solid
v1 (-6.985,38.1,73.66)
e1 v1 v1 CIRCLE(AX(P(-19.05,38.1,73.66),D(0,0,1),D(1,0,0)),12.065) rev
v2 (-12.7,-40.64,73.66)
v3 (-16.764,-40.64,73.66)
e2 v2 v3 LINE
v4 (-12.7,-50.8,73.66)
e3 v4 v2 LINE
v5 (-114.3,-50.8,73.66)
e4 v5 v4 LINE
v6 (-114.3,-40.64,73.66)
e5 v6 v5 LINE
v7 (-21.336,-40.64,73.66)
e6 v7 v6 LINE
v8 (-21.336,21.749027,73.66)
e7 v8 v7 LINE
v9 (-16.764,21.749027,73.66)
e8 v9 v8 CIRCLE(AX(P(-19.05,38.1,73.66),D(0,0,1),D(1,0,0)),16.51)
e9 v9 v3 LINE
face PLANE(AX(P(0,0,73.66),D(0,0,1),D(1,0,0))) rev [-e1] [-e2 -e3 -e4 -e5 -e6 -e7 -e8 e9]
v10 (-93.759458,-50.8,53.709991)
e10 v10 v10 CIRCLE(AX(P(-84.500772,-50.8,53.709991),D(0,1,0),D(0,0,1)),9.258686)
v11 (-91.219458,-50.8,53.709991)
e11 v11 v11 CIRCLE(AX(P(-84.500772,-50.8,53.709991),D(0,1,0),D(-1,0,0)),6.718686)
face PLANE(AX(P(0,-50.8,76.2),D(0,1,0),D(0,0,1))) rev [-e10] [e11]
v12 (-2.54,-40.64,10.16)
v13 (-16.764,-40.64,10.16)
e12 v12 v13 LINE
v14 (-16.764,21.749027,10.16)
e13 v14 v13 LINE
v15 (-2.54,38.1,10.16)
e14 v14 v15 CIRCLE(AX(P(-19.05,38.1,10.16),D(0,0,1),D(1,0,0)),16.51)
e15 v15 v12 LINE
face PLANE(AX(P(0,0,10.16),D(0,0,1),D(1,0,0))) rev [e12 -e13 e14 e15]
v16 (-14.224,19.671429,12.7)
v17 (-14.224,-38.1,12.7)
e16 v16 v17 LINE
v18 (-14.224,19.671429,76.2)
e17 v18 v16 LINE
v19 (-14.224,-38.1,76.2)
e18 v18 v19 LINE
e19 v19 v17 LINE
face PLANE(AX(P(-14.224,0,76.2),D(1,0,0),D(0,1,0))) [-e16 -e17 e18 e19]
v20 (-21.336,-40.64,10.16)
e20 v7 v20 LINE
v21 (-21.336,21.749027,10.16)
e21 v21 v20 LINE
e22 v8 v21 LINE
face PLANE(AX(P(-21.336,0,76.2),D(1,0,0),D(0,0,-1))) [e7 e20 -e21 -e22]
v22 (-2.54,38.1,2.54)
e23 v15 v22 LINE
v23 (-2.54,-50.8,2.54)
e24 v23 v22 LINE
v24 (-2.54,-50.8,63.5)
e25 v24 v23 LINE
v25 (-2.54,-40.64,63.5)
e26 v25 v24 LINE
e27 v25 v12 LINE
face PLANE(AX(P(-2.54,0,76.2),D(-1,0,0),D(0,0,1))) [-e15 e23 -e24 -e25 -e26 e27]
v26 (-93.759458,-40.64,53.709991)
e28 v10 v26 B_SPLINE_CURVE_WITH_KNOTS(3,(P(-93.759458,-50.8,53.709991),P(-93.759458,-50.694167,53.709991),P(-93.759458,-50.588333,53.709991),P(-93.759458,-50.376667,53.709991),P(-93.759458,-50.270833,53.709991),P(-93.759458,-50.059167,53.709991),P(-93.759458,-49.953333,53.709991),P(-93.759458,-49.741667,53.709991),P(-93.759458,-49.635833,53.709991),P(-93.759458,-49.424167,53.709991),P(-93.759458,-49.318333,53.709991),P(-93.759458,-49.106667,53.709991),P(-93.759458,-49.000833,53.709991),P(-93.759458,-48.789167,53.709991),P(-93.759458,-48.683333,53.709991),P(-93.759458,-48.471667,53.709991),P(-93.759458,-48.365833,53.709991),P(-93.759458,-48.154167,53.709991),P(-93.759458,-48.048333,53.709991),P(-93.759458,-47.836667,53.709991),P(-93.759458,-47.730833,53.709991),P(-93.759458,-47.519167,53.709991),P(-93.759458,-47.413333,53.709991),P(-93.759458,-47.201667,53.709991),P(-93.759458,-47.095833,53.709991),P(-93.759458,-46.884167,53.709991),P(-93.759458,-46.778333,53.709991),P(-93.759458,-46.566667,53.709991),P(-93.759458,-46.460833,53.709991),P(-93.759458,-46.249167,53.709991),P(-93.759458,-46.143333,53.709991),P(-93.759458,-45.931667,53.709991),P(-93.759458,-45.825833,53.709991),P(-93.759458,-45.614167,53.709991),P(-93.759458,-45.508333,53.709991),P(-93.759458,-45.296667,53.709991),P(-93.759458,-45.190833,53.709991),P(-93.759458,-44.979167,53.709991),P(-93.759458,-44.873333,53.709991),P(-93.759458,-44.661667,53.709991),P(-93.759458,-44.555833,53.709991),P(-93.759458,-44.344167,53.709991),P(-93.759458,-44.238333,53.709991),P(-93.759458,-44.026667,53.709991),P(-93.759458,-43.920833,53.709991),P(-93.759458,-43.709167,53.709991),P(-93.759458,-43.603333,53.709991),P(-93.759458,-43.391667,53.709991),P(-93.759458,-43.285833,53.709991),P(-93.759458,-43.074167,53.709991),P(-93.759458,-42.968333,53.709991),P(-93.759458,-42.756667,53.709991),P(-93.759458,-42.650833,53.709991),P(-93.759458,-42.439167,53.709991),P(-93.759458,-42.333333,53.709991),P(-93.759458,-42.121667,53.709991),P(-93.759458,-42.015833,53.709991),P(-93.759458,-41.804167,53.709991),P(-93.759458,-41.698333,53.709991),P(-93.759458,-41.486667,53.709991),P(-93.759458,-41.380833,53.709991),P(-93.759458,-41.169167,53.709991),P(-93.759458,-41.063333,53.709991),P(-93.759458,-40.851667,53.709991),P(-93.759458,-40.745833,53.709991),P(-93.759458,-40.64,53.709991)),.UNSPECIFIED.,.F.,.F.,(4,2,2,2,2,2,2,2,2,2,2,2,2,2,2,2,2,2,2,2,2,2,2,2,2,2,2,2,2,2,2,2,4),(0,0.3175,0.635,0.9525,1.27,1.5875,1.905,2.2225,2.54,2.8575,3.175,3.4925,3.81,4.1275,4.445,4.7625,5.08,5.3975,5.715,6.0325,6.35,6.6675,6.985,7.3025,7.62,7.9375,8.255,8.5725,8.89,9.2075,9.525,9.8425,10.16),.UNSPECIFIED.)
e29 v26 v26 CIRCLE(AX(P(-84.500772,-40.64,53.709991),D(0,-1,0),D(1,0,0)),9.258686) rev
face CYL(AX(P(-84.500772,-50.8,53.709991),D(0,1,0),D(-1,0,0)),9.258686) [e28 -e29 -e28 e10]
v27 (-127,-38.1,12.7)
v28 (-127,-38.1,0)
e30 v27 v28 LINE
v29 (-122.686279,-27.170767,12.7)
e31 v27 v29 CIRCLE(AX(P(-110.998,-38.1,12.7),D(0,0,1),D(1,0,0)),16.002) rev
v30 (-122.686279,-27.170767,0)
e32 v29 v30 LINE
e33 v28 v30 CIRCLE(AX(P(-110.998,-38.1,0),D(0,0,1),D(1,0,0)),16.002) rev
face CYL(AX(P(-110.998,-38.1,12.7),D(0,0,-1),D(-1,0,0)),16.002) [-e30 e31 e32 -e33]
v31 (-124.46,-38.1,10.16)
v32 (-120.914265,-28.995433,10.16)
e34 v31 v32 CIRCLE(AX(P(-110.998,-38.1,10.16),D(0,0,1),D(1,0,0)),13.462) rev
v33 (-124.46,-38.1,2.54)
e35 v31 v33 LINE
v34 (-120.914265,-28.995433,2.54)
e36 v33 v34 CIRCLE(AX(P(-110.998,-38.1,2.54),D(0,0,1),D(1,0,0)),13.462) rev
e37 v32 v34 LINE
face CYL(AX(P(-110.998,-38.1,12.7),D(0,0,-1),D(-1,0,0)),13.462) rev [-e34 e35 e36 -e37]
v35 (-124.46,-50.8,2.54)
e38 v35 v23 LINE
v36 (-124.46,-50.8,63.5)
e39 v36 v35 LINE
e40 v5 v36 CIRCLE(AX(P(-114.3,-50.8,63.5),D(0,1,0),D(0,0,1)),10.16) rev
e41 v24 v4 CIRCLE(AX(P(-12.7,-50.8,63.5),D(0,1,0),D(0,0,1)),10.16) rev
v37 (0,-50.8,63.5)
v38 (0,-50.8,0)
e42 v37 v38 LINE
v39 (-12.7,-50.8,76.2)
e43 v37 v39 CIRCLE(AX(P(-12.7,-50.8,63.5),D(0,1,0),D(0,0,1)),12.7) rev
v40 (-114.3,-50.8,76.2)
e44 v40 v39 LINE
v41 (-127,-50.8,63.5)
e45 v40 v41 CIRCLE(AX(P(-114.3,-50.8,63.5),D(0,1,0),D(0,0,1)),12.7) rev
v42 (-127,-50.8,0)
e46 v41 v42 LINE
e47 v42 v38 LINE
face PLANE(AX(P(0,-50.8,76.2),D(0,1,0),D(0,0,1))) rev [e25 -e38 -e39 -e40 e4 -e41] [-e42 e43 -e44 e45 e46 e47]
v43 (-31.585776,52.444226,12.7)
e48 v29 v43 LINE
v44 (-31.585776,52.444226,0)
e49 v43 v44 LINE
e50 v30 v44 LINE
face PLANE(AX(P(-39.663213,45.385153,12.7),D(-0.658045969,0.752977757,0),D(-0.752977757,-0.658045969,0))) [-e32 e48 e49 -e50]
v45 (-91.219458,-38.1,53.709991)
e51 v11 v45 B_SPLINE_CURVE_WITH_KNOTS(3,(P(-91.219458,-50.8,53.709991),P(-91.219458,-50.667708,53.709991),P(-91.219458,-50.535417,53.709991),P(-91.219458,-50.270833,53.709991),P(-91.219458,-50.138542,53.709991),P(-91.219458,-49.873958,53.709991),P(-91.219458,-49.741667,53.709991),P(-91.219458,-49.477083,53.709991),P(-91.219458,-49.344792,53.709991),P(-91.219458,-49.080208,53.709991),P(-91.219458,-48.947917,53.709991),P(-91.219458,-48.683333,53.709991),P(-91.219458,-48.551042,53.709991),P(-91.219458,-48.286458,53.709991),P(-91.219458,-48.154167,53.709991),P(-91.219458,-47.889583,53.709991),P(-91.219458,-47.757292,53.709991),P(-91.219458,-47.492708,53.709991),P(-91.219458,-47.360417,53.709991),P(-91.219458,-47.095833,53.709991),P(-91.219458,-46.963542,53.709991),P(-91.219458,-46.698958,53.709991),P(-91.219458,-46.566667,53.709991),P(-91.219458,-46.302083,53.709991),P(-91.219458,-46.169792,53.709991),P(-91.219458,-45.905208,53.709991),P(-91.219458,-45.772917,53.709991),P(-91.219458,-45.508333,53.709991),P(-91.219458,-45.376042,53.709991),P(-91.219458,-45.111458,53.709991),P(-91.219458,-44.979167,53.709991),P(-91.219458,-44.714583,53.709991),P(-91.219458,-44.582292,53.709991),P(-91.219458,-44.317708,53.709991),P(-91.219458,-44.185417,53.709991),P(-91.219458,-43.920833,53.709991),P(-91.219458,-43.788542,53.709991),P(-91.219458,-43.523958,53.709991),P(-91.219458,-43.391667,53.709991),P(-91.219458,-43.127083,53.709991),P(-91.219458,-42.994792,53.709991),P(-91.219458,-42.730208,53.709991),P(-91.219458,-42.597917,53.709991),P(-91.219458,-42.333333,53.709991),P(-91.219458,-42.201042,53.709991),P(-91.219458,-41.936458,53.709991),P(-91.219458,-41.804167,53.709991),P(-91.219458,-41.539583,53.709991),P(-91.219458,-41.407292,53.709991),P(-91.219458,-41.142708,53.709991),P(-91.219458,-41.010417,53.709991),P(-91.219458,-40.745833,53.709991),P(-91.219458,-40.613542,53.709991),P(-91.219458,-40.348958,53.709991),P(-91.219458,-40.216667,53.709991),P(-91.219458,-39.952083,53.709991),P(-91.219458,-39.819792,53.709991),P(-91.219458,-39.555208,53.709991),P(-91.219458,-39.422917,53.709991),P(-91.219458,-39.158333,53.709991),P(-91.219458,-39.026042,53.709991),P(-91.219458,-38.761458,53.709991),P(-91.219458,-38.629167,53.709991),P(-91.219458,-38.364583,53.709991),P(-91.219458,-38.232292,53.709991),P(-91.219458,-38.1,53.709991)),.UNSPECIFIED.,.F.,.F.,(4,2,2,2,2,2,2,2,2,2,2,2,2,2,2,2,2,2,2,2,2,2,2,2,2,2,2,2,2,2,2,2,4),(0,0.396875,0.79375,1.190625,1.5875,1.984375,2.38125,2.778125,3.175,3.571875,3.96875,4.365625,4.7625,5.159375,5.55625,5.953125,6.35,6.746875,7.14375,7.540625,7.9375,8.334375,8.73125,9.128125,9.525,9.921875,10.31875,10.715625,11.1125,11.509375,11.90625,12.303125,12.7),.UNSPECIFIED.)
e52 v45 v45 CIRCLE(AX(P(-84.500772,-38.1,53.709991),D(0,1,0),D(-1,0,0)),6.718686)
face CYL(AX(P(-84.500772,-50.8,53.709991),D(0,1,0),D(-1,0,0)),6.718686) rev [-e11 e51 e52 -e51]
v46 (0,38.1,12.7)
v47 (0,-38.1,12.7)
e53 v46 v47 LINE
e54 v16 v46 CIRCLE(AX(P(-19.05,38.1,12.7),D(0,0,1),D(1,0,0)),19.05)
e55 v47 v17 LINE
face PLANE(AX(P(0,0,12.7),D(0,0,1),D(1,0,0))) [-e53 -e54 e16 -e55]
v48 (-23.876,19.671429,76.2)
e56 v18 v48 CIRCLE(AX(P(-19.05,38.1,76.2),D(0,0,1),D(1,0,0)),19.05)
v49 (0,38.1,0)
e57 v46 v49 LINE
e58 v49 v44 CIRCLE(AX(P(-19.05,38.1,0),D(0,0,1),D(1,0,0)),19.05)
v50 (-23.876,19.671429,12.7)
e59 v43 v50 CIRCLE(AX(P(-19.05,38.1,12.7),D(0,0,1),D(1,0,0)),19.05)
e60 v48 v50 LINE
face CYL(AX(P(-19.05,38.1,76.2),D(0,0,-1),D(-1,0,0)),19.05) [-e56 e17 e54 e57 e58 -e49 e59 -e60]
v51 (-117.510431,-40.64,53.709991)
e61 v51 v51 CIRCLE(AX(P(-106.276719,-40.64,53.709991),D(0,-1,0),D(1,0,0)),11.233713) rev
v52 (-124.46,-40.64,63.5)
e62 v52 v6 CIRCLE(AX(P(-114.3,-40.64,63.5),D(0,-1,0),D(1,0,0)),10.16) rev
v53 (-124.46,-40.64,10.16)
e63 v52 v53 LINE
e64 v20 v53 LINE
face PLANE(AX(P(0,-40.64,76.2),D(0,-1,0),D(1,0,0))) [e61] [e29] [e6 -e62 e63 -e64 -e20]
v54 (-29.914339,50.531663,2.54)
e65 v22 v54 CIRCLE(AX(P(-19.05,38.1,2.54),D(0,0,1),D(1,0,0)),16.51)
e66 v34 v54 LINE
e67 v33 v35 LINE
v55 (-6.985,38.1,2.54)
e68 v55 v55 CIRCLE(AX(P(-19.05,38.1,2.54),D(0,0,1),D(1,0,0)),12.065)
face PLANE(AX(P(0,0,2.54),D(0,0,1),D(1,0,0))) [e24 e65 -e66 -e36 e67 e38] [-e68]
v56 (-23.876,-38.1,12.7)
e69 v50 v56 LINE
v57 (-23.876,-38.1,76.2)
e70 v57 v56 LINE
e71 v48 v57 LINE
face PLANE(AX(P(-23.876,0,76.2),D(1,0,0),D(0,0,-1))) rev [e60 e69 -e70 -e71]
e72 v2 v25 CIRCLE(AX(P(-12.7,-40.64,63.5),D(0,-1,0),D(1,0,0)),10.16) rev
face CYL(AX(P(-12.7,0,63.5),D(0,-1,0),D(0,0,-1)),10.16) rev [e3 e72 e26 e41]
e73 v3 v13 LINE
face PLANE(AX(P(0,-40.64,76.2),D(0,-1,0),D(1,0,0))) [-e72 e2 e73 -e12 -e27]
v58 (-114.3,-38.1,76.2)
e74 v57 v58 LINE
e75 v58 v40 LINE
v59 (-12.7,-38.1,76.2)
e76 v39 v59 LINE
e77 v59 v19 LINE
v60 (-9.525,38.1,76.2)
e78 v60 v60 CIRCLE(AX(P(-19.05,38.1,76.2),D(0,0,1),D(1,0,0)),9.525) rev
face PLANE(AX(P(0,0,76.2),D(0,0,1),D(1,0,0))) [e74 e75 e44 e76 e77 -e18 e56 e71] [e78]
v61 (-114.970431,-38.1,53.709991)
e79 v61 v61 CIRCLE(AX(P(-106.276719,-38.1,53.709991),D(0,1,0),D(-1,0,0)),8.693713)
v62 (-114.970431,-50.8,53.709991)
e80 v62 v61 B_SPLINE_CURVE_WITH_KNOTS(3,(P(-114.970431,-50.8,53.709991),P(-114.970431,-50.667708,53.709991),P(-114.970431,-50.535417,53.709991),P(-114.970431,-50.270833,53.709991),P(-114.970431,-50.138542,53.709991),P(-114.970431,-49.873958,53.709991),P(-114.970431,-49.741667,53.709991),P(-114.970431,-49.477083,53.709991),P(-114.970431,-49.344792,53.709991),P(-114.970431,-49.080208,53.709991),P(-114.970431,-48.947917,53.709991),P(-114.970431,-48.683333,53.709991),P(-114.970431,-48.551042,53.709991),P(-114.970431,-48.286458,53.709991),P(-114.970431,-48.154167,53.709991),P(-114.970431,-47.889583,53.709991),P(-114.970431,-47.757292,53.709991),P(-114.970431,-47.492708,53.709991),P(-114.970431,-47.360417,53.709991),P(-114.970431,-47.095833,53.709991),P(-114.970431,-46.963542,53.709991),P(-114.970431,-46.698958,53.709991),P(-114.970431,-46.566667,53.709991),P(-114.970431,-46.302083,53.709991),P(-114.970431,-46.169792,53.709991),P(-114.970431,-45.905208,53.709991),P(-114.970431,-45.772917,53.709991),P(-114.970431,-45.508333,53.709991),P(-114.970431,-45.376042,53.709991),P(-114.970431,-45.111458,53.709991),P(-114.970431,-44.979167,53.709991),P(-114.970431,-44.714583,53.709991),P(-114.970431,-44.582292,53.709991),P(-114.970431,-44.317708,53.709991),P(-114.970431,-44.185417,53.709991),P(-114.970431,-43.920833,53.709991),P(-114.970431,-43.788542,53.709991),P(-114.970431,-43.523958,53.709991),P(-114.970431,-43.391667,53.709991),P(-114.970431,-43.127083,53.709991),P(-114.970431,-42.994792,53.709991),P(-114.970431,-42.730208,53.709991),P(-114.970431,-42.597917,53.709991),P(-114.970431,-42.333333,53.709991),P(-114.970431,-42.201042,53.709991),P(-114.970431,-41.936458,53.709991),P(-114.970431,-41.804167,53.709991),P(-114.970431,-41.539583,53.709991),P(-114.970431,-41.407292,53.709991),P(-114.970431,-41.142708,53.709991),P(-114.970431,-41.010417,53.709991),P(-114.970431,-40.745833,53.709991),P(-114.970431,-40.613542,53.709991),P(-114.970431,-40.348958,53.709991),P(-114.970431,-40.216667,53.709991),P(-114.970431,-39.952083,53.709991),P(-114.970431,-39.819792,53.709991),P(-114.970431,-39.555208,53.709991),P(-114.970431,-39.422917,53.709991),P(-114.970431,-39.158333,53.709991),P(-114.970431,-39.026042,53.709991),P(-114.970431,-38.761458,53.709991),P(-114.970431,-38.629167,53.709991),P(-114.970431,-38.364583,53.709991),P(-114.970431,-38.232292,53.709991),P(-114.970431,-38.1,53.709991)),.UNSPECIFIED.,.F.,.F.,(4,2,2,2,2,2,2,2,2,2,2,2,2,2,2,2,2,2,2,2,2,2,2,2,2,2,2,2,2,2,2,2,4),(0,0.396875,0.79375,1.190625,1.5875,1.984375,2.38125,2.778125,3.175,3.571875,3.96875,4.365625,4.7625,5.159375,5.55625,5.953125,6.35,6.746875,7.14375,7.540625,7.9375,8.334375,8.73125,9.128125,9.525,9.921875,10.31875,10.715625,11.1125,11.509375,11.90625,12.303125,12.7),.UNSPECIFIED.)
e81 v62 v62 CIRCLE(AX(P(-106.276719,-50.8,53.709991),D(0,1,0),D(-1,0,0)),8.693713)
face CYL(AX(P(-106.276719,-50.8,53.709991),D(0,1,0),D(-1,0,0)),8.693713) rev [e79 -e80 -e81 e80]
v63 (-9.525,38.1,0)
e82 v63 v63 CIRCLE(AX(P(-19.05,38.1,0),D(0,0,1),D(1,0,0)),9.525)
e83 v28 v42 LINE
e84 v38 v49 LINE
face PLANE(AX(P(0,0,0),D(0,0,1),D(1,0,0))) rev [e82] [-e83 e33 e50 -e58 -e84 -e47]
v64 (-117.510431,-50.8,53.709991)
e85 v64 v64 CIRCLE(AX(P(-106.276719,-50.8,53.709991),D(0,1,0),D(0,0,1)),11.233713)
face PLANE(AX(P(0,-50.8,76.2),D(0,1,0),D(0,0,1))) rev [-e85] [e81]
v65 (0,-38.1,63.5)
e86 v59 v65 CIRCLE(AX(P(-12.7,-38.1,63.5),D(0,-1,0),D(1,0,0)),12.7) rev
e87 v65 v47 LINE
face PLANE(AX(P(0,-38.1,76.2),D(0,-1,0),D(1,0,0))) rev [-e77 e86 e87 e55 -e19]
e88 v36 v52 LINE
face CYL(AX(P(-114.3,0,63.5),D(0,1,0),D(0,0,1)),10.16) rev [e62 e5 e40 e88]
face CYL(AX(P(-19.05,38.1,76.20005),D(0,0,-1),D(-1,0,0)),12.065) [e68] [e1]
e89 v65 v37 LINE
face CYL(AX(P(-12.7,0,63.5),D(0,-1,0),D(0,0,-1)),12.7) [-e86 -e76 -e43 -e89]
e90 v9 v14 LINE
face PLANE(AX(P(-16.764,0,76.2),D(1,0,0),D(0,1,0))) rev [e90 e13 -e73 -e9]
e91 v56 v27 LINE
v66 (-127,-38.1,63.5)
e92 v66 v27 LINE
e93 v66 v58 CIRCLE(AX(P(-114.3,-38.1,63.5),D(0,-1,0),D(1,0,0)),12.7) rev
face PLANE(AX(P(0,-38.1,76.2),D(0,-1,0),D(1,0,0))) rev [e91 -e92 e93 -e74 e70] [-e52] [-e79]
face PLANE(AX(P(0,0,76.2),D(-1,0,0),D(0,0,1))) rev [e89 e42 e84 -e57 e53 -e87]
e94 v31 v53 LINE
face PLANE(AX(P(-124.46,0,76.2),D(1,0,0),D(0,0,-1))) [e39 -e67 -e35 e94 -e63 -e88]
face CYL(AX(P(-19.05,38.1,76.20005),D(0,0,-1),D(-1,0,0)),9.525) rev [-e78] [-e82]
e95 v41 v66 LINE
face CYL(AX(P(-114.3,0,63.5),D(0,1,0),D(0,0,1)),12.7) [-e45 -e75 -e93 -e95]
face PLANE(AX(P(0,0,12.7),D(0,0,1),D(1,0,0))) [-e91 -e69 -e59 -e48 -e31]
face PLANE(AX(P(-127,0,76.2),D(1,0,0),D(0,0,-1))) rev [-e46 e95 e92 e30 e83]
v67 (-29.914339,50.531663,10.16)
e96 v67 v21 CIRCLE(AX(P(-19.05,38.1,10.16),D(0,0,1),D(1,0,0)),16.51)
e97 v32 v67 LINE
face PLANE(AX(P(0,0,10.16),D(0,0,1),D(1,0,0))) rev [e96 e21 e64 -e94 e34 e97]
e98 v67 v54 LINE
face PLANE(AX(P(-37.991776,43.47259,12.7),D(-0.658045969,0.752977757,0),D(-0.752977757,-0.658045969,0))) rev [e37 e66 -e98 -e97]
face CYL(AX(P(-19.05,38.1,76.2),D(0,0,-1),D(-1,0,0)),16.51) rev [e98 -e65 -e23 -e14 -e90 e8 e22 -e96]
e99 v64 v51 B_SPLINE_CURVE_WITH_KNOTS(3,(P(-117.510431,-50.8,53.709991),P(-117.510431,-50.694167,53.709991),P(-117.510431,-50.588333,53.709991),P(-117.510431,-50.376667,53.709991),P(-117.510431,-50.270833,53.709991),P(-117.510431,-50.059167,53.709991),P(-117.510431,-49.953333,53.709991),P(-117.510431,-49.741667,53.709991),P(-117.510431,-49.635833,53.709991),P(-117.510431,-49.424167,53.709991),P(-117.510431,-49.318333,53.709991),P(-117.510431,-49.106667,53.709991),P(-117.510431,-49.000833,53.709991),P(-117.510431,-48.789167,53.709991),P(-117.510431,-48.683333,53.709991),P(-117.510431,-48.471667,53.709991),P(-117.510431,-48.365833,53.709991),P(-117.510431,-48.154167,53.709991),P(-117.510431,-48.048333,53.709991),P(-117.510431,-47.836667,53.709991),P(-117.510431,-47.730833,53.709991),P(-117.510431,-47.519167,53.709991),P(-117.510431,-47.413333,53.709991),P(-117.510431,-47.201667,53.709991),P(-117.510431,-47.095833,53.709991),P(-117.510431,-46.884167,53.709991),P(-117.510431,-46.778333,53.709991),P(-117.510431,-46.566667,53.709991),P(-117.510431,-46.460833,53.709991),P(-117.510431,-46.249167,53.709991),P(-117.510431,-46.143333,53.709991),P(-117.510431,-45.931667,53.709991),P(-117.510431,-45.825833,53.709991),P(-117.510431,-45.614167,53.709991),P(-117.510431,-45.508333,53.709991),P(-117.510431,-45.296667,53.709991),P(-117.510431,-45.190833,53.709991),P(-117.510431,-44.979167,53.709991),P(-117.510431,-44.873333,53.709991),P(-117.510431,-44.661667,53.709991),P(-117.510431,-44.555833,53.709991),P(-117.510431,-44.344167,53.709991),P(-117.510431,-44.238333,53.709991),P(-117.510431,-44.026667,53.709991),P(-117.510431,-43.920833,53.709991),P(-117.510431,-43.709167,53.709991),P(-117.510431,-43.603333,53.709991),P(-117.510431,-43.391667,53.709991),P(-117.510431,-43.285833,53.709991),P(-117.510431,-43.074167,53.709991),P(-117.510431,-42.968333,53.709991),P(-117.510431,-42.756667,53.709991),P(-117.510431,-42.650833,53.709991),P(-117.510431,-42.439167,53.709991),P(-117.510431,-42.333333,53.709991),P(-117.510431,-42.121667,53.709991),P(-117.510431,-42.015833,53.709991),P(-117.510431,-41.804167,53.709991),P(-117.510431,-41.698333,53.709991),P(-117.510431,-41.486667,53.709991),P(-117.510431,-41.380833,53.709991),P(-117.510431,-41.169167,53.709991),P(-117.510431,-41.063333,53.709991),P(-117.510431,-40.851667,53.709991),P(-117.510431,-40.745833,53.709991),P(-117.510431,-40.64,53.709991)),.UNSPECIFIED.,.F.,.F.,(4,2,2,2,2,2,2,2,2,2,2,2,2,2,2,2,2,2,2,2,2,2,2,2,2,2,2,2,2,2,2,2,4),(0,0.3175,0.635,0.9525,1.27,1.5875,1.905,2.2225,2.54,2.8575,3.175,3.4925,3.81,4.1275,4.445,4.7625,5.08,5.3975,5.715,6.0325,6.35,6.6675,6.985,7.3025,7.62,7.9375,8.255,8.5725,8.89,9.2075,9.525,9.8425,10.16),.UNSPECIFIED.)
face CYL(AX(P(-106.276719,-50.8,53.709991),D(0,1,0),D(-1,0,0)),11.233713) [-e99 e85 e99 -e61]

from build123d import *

# Parameters (mm, degrees)
SKETCH1_W            = 127
SKETCH1_H            = 12.7
BOSS_EXTRUDE1_DEPTH  = 76.2
FILLET2_R            = 12.7
BOSS_EXTRUDE3_DEPTH  = 76.2
BOSS_EXTRUDE4_DEPTH  = 12.7
SKETCH3_R            = 8.693712638
SKETCH3_R_2          = 6.718686286
CUT_EXTRUDE2_DEPTH   = 177.090892723
SKETCH1_8_R          = 9.525
CUT_EXTRUDE3_DEPTH   = 159.75
SHELL4_START         = 2.54
SHELL4_OUTLINE_R     = 12.065
SHELL4_DEPTH         = 41.911304946
SHELL4_2_DEPTH       = 7.62
SHELL4_START_2       = 62.968677719
SHELL4_3_OUTLINE_R   = 12.065
SHELL4_3_DEPTH       = 0.531322281
SHELL4_START_3       = -50.8
SHELL4_4_DEPTH       = 10.16
SHELL4_START_4       = -40.64
SHELL4_5_OUTLINE_W   = 4.572
SHELL4_5_OUTLINE_H   = 18.517372773
SHELL4_5_OUTLINE_H_2 = 10.16
SHELL4_5_DEPTH       = 66.6749999
SHELL4_6_DEPTH       = 10.16
SHELL4_START_5       = 44.451304946
SHELL4_7_OUTLINE_R   = 12.065
SHELL4_7_DEPTH       = 29.208695054


with BuildPart() as part:
    # Sketch1 → Boss-Extrude1 (new body)
    with BuildSketch(Plane.XY):
        with Locations((-63.5, -44.45)):
            Rectangle(SKETCH1_W, SKETCH1_H)
    extrude(amount=BOSS_EXTRUDE1_DEPTH)

    # Fillet2
    fillet2_edges = [part.edges().sort_by_distance(p)[0] for p in [
        (-127, -44.45, 76.2),
        (0, -44.45, 76.2),
    ]]
    fillet(fillet2_edges, radius=FILLET2_R)

    # Sketch1<6> → Boss-Extrude3 (add)
    with BuildSketch(Plane.XY):
        with BuildLine():
            ThreePointArc((-14.224, 19.671429138), (-19.05, 57.15), (-23.876, 19.671429138))
            Line((-23.876, 19.671429138), (-23.876, -38.1))
            Line((-23.876, -38.1), (-14.224, -38.1))
            Line((-14.224, -38.1), (-14.224, 19.671429138))
        make_face()
    extrude(amount=BOSS_EXTRUDE3_DEPTH)

    # Sketch1<7> → Boss-Extrude4 (add)
    with BuildSketch(Plane.XY):
        with BuildLine():
            ThreePointArc((-23.876, 19.671429138), (-37.59378257, 33.737589198), (-31.585775702, 52.444226279))
            Line((-31.585775702, 52.444226279), (-122.686278821, -27.170766624))
            ThreePointArc((-122.686278821, -27.170766624), (-125.882553095, -32.225131223), (-127, -38.1))
            Line((-127, -38.1), (-23.876, -38.1))
            Line((-23.876, -38.1), (-23.876, 19.671429138))
        make_face()
        with BuildLine():
            Line((0, -38.1), (0, 38.1))
            ThreePointArc((0, 38.1), (-3.969585549, 26.460257735), (-14.224, 19.671429138))
            Line((-14.224, 19.671429138), (-14.224, -38.1))
            Line((-14.224, -38.1), (0, -38.1))
        make_face()
    extrude(amount=BOSS_EXTRUDE4_DEPTH)

    # Sketch3 → Cut-Extrude2 (cut, through all)
    with BuildSketch(Plane(origin=(0, -38.1, 0), x_dir=(1, 0, 0), z_dir=(0, 1, 0))):
        with Locations(Location((-106.276718745, -53.709991333, 0), (0, 0, 180))):
            Circle(SKETCH3_R)
        with Locations(Location((-84.500771906, -53.709991333, 0), (0, 0, 180))):
            Circle(SKETCH3_R_2)
    extrude(amount=-CUT_EXTRUDE2_DEPTH, mode=Mode.SUBTRACT)

    # Sketch1<8> → Cut-Extrude3 (cut, through all)
    with BuildSketch(Plane.XY):
        with Locations((-19.05, 38.1)):
            Circle(SKETCH1_8_R)
    extrude(amount=CUT_EXTRUDE3_DEPTH, mode=Mode.SUBTRACT)

    # Shell4: read off the stored shape, not the designer's step
    # Shell4 outline → Shell4 (cut)
    with BuildSketch(Plane.XY.offset(SHELL4_START)):
        with BuildLine():
            ThreePointArc((-16.764, 21.74902743), (-19.05, 54.61), (-21.336, 21.74902743))
            Line((-21.336, 21.74902743), (-21.336, -40.64))
            Line((-21.336, -40.64), (-124.46, -40.64))
            Line((-124.46, -40.64), (-124.46, -50.8))
            Line((-124.46, -50.8), (-2.54, -50.8))
            Line((-2.54, -50.8), (-2.54, -40.64))
            Line((-2.54, -40.64), (-16.764, -40.64))
            Line((-16.764, -40.64), (-16.764, 21.74902743))
        make_face()
        with Locations((-19.05, 38.1)):
            Circle(SHELL4_OUTLINE_R, mode=Mode.SUBTRACT)
    extrude(amount=SHELL4_DEPTH, mode=Mode.SUBTRACT)

    # Shell4 2 outline → Shell4 2 (cut)
    with BuildSketch(Plane.XY.offset(SHELL4_START)):
        with BuildLine():
            Line((-21.336, -40.64), (-21.336, 21.74902743))
            ThreePointArc((-21.336, 21.74902743), (-34.872227338, 33.384364087), (-29.914338942, 50.531662775))
            Line((-29.914338942, 50.531662775), (-120.914264565, -28.995432955))
            ThreePointArc((-120.914264565, -28.995432955), (-123.542285503, -33.214680644), (-124.46, -38.1))
            Line((-124.46, -38.1), (-124.46, -40.64))
            Line((-124.46, -40.64), (-21.336, -40.64))
        make_face()
        with BuildLine():
            Line((-2.54, -40.64), (-2.54, 38.1))
            ThreePointArc((-2.54, 38.1), (-6.593636968, 27.263989664), (-16.764, 21.74902743))
            Line((-16.764, 21.74902743), (-16.764, -40.64))
            Line((-16.764, -40.64), (-2.54, -40.64))
        make_face()
    extrude(amount=SHELL4_2_DEPTH, mode=Mode.SUBTRACT)

    # Shell4 3 outline → Shell4 3 (cut)
    with BuildSketch(Plane.XY.offset(SHELL4_START_2)):
        with BuildLine():
            ThreePointArc((-16.764, 21.74902743), (-19.05, 54.61), (-21.336, 21.74902743))
            Line((-21.336, 21.74902743), (-21.336, -40.64))
            Line((-21.336, -40.64), (-124.46, -40.64))
            Line((-124.46, -40.64), (-124.46, -50.8))
            Line((-124.46, -50.8), (-2.54, -50.8))
            Line((-2.54, -50.8), (-2.54, -40.64))
            Line((-2.54, -40.64), (-16.764, -40.64))
            Line((-16.764, -40.64), (-16.764, 21.74902743))
        make_face()
        with Locations((-19.05, 38.1)):
            Circle(SHELL4_3_OUTLINE_R, mode=Mode.SUBTRACT)
    extrude(amount=SHELL4_3_DEPTH, mode=Mode.SUBTRACT)

    # Shell4 4 outline → Shell4 4 (cut)
    with BuildSketch(Plane(origin=(0, 0, 0), x_dir=(1, 0, 0), z_dir=(0, 1, 0)).offset(SHELL4_START_3)):
        with BuildLine():
            Line((-2.54, -62.968677719), (-2.54, -44.451304946))
            Line((-2.54, -44.451304946), (-84.500771906, -44.451305047))
            ThreePointArc((-84.500771906, -44.451305047), (-75.24208562, -53.709991333), (-84.500771906, -62.968677619))
            Line((-84.500771906, -62.968677619), (-2.54, -62.968677719))
        make_face()
        with BuildLine():
            ThreePointArc((-12.7, -73.66), (-5.515795103, -70.684204897), (-2.54, -63.5))
            Line((-2.54, -63.5), (-100.767451105, -63.5))
            ThreePointArc((-100.767451105, -63.5), (-106.276718745, -64.943703971), (-111.785986385, -63.5))
            Line((-111.785986385, -63.5), (-124.46, -63.5))
            ThreePointArc((-124.46, -63.5), (-121.484204897, -70.684204897), (-114.3, -73.66))
            Line((-114.3, -73.66), (-12.7, -73.66))
        make_face()
        with BuildLine():
            ThreePointArc((-84.500771906, -62.968677619), (-93.759458192, -53.709991333), (-84.500771906, -44.451305047))
            Line((-84.500771906, -44.451305047), (-99.914877343, -44.451304946))
            ThreePointArc((-99.914877343, -44.451304946), (-95.043006107, -53.709991332), (-99.914877342, -62.968677719))
            Line((-99.914877342, -62.968677719), (-84.500771906, -62.968677619))
        make_face()
        with BuildLine():
            ThreePointArc((-112.638560148, -62.968677719), (-117.510431383, -53.709991332), (-112.638560147, -44.451304946))
            Line((-112.638560147, -44.451304946), (-124.46, -44.451304946))
            Line((-124.46, -44.451304946), (-124.46, -62.968677719))
            Line((-124.46, -62.968677719), (-112.638560148, -62.968677719))
        make_face()
    extrude(amount=SHELL4_4_DEPTH, mode=Mode.SUBTRACT)

    # Shell4 5 outline → Shell4 5 (cut)
    with BuildSketch(Plane(origin=(0, 0, 0), x_dir=(1, 0, 0), z_dir=(0, 1, 0)).offset(SHELL4_START_4)):
        with Locations((-19.05, -53.709991333)):
            Rectangle(SHELL4_5_OUTLINE_W, SHELL4_5_OUTLINE_H)
        with Locations((-19.05, -68.58)):
            Rectangle(SHELL4_5_OUTLINE_W, SHELL4_5_OUTLINE_H_2)
    extrude(amount=SHELL4_5_DEPTH, mode=Mode.SUBTRACT)

    # Shell4 6 outline → Shell4 6 (add)
    with BuildSketch(Plane(origin=(0, 0, 0), x_dir=(1, 0, 0), z_dir=(0, 1, 0)).offset(SHELL4_START_3)):
        with BuildLine():
            Line((-112.638560147, -44.451304946), (-99.914877343, -44.451304946))
            ThreePointArc((-99.914877343, -44.451304946), (-106.276718745, -42.476278695), (-112.638560147, -44.451304946))
        make_face()
        with BuildLine():
            Line((-111.785986385, -63.5), (-100.767451105, -63.5))
            ThreePointArc((-100.767451105, -63.5), (-100.335222021, -63.243873874), (-99.914877342, -62.968677719))
            Line((-99.914877342, -62.968677719), (-112.638560148, -62.968677719))
            ThreePointArc((-112.638560148, -62.968677719), (-112.218215469, -63.243873874), (-111.785986385, -63.5))
        make_face()
    extrude(amount=SHELL4_6_DEPTH)

    # Shell4 7 outline → Shell4 7 (cut)
    with BuildSketch(Plane.XY.offset(SHELL4_START_5)):
        with BuildLine():
            ThreePointArc((-16.764, 21.74902743), (-19.05, 54.61), (-21.336, 21.74902743))
            Line((-21.336, 21.74902743), (-19.05, 21.429425891))
            Line((-19.05, 21.429425891), (-16.764, 21.74902743))
        make_face()
        with Locations((-19.05, 38.1)):
            Circle(SHELL4_7_OUTLINE_R, mode=Mode.SUBTRACT)
    extrude(amount=SHELL4_7_DEPTH, mode=Mode.SUBTRACT)


solid = part.part
